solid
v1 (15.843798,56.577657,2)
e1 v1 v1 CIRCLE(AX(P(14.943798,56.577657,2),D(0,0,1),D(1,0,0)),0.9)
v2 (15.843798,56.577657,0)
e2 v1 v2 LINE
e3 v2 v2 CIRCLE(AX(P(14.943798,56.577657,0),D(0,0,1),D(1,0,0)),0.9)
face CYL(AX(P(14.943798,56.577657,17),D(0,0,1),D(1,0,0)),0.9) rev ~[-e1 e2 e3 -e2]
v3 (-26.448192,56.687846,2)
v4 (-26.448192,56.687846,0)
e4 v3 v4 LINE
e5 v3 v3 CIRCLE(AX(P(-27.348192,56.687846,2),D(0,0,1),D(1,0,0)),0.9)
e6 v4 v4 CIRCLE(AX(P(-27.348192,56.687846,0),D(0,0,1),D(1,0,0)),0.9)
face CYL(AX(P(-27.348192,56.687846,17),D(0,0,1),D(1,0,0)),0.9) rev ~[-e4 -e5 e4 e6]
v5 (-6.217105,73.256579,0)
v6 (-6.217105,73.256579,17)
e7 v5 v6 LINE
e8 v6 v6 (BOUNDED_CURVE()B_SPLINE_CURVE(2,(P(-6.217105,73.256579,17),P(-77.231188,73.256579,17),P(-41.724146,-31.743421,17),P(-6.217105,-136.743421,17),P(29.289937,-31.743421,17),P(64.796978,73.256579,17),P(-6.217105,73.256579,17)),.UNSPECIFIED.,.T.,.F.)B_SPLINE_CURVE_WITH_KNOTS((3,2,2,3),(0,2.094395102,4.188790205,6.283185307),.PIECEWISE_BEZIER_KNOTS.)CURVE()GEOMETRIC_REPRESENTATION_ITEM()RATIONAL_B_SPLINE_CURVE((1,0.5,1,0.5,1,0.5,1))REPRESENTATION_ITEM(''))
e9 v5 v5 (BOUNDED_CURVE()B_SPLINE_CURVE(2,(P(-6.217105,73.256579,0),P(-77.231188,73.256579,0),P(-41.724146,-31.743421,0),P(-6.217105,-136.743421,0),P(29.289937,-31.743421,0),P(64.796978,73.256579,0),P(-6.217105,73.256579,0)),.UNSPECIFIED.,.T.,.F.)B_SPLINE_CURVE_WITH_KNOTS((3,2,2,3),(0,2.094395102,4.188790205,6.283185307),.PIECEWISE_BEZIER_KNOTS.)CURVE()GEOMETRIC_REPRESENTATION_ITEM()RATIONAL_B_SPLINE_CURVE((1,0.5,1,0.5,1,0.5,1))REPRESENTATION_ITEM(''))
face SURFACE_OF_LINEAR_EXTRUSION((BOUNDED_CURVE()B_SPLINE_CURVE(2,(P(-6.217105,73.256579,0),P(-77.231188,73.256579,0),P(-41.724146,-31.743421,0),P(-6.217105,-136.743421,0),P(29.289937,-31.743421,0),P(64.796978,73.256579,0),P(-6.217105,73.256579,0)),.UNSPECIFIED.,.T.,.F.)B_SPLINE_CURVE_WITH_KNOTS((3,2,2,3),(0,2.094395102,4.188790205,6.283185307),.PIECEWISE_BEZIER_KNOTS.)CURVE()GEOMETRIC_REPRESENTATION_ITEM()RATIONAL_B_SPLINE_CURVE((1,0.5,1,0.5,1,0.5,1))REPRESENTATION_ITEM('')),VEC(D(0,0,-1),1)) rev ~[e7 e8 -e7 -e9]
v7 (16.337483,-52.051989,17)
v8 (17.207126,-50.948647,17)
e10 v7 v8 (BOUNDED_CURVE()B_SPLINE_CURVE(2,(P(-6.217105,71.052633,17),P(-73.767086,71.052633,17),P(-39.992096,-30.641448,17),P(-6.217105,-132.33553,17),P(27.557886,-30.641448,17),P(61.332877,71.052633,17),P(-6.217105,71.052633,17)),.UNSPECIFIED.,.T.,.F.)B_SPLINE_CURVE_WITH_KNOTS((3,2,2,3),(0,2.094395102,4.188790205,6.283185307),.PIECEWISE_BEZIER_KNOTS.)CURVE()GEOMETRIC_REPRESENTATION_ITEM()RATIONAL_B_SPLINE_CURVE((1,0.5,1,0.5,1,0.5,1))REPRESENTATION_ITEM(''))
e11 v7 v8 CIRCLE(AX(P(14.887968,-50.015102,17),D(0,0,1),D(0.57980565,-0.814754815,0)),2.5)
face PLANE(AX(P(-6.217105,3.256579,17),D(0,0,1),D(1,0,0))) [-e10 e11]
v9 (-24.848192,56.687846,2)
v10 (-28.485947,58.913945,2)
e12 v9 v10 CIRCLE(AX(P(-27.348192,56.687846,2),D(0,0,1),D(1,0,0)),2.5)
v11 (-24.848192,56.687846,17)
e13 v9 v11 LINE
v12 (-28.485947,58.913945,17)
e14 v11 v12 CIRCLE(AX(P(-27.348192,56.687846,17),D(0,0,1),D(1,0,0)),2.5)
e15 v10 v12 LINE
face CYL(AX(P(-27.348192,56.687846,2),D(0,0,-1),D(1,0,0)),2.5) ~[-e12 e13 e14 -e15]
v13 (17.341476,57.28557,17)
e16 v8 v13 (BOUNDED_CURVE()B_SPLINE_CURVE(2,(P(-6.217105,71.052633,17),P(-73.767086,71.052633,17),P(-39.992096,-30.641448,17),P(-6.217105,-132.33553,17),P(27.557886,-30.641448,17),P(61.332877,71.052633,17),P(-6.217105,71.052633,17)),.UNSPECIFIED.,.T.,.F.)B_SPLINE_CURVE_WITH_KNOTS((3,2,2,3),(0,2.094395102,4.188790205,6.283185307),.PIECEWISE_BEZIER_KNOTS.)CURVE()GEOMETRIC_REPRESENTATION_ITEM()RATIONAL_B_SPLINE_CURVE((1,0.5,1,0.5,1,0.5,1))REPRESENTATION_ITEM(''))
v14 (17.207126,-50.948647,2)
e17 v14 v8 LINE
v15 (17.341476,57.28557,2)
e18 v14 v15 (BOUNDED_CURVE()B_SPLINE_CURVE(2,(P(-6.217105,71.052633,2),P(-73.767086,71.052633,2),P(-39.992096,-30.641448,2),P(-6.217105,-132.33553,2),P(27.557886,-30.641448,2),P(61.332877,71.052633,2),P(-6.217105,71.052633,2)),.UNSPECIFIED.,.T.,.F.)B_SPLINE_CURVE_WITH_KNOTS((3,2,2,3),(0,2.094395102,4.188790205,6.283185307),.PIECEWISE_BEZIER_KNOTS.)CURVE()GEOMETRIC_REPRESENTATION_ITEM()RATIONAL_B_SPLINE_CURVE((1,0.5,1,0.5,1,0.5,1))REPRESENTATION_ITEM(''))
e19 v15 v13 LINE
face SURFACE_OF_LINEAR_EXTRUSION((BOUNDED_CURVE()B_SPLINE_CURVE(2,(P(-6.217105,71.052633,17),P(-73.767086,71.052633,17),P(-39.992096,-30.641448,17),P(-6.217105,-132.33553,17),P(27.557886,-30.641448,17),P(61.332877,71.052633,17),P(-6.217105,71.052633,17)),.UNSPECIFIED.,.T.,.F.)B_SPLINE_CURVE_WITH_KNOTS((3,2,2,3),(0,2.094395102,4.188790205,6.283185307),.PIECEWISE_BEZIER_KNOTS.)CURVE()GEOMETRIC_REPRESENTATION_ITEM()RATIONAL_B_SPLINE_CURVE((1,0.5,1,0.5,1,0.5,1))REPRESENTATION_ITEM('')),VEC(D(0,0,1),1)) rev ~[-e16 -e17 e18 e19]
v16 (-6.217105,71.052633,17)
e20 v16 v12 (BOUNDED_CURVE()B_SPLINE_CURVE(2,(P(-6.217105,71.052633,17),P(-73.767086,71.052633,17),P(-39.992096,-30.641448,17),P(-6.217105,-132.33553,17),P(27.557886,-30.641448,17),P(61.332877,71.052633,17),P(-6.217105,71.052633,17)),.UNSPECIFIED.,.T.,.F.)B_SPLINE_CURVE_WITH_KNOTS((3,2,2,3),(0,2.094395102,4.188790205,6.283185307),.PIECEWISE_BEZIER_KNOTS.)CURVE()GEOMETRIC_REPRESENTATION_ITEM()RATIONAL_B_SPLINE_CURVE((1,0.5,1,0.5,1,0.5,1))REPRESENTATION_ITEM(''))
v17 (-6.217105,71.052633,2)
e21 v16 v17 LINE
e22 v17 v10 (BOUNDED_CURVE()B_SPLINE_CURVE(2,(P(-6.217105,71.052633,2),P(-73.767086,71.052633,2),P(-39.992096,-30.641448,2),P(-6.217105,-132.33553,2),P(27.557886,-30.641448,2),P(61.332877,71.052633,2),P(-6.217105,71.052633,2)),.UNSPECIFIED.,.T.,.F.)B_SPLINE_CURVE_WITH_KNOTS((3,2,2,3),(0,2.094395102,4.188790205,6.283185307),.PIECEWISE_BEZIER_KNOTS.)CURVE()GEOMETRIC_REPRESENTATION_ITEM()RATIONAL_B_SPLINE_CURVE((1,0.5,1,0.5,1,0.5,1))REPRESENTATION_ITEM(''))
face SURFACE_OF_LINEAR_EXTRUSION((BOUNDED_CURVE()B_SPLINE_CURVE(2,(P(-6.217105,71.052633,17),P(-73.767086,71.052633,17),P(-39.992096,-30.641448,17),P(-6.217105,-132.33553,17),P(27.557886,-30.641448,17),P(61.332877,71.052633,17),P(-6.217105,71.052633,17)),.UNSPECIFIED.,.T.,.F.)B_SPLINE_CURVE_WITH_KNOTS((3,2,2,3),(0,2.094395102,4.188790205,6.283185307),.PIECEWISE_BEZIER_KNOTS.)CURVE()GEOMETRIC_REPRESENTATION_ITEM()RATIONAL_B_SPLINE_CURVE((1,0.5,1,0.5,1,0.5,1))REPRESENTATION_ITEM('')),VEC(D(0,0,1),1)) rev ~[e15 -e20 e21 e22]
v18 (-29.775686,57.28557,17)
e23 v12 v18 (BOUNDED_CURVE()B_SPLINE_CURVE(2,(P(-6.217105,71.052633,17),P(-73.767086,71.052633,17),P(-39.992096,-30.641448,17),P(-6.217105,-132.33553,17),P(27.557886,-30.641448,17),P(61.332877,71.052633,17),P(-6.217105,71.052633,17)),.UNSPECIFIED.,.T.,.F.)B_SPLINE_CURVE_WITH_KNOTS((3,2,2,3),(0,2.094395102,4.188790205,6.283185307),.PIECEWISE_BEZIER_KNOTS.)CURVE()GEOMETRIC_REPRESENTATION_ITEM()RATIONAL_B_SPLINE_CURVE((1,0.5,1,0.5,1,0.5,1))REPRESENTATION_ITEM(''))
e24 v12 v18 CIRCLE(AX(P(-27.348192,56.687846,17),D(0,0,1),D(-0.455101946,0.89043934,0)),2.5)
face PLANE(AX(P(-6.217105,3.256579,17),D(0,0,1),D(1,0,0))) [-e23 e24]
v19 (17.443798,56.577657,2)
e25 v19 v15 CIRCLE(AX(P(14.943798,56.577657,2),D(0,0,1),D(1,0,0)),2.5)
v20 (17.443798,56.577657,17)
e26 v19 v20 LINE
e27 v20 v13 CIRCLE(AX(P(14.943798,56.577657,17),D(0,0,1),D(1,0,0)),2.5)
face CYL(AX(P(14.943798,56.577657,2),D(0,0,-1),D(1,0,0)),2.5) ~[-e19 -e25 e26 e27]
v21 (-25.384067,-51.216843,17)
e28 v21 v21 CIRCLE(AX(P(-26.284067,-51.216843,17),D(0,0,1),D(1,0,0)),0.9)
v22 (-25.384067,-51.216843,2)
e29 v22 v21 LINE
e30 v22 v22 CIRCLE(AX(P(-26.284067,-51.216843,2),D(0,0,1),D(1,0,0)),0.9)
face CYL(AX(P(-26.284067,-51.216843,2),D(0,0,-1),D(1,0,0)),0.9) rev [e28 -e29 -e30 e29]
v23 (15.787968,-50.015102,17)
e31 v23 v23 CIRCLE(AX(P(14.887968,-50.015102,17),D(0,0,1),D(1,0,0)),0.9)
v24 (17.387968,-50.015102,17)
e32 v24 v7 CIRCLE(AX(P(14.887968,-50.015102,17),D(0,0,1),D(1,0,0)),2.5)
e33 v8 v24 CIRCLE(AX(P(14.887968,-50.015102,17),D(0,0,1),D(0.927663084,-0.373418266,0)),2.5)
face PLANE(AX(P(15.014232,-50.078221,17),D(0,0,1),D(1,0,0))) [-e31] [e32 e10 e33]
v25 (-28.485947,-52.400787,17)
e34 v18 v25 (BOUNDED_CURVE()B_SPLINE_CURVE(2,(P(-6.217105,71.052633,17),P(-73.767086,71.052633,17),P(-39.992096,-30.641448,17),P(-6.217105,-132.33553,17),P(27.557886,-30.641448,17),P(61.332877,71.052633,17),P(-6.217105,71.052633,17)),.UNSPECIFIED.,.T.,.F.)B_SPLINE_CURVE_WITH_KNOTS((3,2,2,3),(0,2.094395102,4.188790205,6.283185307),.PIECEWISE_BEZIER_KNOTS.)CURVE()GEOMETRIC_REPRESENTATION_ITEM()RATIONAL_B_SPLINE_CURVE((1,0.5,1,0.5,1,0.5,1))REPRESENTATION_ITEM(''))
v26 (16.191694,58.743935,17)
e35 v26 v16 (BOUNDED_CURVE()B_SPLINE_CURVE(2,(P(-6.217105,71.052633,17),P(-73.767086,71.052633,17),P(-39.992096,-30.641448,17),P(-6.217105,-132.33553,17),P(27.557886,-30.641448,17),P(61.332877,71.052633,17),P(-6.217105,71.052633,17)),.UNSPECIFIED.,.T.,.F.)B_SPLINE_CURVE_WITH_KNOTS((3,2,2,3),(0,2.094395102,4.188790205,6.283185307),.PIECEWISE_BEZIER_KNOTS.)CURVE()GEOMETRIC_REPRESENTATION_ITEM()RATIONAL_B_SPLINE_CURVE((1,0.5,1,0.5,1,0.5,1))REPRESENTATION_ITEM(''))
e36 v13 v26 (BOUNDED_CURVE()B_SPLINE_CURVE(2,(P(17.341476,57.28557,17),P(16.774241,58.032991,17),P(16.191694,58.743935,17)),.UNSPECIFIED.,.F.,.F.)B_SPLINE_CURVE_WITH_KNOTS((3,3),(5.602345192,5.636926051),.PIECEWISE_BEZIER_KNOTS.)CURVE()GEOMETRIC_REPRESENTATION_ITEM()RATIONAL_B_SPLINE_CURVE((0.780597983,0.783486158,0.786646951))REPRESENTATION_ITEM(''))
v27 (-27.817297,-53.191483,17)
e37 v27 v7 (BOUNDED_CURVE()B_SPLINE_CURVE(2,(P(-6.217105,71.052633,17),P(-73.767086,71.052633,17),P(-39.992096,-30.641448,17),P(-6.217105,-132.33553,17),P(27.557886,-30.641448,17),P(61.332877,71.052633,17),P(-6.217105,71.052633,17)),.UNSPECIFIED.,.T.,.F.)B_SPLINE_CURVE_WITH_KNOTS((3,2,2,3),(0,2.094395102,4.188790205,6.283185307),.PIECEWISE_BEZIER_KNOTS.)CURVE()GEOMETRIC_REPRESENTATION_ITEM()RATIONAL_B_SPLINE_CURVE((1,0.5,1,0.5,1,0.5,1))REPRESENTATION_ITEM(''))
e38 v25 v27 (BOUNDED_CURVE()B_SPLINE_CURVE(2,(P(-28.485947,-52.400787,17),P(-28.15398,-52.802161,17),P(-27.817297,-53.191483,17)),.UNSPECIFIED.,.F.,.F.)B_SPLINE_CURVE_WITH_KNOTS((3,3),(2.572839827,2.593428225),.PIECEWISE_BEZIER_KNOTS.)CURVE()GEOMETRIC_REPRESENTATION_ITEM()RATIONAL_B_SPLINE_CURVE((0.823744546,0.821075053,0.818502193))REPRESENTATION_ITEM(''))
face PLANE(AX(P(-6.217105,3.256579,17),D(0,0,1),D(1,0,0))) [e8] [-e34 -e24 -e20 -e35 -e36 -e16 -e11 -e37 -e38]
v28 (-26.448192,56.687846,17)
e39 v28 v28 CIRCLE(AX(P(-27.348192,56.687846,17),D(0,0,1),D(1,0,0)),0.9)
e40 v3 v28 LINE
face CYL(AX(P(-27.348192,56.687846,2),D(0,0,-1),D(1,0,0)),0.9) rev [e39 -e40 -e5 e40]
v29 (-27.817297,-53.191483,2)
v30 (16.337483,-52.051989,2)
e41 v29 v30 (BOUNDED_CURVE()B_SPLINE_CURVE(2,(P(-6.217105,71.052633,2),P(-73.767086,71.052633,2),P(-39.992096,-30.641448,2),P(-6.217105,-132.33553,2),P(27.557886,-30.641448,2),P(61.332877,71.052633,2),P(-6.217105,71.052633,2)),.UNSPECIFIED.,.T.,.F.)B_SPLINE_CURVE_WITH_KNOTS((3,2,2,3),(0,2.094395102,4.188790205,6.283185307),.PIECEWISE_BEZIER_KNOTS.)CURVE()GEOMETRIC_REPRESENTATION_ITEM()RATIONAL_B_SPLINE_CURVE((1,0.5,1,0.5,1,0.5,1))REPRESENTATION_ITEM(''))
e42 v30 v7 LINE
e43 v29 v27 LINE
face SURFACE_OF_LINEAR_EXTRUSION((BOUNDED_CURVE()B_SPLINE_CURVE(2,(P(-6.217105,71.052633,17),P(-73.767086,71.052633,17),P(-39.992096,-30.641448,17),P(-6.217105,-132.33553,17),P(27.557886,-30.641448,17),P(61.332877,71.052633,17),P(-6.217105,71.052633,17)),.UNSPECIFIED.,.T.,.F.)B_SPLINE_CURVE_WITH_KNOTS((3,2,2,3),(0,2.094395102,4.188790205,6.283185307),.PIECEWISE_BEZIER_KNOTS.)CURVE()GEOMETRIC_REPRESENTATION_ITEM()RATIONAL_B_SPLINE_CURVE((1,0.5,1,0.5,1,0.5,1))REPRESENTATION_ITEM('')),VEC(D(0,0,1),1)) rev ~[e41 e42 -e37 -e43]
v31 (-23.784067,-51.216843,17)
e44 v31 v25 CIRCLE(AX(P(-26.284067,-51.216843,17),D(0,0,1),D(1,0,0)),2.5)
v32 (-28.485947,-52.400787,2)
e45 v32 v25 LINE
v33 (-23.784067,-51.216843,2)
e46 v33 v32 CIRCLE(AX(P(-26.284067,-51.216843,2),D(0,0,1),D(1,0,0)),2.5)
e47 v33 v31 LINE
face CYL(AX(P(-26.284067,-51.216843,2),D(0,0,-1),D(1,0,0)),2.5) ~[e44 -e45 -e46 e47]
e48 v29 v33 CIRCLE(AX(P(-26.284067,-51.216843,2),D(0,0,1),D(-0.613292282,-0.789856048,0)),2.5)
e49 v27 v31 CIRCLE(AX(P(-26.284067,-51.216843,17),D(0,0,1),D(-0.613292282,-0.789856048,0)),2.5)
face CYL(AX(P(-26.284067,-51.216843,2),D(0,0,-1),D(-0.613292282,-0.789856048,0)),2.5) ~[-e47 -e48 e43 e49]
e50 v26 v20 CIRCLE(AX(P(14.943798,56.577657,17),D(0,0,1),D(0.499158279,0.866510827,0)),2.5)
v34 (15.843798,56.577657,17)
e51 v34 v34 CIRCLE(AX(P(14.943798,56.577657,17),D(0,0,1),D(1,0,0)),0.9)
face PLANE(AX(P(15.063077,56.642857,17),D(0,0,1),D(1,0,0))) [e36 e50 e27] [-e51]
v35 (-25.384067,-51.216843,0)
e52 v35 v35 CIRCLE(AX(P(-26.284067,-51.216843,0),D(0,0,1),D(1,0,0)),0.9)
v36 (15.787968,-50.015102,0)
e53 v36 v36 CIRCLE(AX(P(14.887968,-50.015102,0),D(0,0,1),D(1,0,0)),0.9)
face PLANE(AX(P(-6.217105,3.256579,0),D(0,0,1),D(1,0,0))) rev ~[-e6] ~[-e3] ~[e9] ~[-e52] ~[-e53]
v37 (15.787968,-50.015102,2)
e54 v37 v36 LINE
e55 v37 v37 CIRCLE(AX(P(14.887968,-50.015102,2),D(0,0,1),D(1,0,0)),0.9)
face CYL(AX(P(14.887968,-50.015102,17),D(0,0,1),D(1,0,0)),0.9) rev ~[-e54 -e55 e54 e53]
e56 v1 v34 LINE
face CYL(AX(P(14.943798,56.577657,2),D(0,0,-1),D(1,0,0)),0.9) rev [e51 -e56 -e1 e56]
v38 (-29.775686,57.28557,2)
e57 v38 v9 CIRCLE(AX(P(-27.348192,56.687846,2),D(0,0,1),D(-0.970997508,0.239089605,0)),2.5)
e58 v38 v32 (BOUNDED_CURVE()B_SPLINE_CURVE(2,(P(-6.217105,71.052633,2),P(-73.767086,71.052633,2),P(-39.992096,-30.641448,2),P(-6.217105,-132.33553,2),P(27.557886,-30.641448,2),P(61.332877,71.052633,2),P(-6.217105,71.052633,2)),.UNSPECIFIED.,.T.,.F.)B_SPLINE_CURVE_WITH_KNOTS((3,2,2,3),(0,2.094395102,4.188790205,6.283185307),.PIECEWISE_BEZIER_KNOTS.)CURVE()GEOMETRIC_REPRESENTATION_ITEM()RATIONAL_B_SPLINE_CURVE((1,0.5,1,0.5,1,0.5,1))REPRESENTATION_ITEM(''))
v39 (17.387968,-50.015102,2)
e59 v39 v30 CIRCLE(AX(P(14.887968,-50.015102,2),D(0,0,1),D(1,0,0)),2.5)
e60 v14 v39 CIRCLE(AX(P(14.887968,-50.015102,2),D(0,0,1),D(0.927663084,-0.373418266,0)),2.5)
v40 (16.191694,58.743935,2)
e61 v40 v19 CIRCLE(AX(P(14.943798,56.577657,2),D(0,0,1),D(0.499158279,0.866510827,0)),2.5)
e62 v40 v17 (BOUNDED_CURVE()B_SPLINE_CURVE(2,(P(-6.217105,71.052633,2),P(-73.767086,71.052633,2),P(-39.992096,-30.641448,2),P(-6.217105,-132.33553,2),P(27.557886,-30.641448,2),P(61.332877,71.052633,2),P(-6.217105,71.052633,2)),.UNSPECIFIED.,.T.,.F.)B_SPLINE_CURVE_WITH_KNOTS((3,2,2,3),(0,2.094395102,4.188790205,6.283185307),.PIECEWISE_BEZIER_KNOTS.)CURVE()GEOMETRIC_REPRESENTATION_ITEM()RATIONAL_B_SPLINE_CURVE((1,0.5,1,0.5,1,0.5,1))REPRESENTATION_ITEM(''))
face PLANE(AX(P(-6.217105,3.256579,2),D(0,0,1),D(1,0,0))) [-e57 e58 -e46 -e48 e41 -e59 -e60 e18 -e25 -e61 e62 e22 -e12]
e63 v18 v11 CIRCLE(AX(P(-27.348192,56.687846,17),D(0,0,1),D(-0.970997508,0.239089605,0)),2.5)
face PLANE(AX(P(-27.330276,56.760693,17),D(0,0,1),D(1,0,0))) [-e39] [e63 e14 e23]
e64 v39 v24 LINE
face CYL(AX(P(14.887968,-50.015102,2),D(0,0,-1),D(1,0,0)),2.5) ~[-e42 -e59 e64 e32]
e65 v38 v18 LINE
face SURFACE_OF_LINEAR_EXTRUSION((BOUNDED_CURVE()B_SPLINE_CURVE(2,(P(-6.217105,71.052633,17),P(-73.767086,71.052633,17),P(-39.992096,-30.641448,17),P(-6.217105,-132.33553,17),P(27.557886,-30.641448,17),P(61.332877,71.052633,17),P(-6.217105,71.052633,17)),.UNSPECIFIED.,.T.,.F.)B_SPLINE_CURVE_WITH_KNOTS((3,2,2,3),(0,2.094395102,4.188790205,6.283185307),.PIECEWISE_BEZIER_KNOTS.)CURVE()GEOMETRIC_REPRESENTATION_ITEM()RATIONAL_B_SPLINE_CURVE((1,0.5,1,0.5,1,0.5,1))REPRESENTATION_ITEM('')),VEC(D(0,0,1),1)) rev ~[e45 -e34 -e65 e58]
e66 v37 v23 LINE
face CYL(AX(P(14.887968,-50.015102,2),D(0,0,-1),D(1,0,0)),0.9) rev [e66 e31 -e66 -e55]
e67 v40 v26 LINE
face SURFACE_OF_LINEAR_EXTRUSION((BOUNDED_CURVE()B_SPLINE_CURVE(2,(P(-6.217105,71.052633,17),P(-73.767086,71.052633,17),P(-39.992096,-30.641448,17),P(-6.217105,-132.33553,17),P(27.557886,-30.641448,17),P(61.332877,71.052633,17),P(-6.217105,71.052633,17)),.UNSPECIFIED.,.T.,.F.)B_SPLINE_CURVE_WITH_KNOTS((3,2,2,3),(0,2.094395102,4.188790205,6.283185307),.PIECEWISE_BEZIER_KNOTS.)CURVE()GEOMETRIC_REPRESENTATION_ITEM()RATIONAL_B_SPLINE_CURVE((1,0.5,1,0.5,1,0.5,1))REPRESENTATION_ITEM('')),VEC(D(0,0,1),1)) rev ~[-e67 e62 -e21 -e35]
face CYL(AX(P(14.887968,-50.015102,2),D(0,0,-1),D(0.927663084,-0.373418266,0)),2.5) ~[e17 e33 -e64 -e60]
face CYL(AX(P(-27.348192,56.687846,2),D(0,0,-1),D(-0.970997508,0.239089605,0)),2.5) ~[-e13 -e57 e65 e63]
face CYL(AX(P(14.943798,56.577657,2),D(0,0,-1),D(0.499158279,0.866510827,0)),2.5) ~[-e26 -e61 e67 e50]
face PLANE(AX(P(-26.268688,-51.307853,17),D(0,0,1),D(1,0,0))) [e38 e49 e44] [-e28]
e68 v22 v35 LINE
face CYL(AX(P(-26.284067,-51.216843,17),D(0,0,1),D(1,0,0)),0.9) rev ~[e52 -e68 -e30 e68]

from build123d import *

# Parameters (mm, degrees)
F1_DEPTH  = 17
F3_DEPTH  = 15
F4_R      = 0.9
F5_DEPTH  = 15
F6_R      = 0.9
F7_DEPTH  = 15
F8_R      = 0.9
F9_DEPTH  = 15
F10_R     = 0.9
F11_DEPTH = 15
F13_R     = 0.9
F14_DEPTH = 17.0010001


with BuildPart() as f1:
    # F0 (on Top) → F1 (new body)
    with BuildSketch(Plane.XY):
        with BuildLine():
            add(Edge.make_bspline(
                [(-6.2171048485, 73.2565789297), (-77.2311879588, 73.2565789297), (-41.7241464036, -31.7434210703), (-6.2171048485, -136.7434210703), (29.2899367067, -31.7434210703), (64.7969782618, 73.2565789297), (-6.2171048485, 73.2565789297)],
                knots=[0, 0, 0, 2.0943951024, 2.0943951024, 4.1887902048, 4.1887902048, 6.2831853072, 6.2831853072, 6.2831853072], degree=2, weights=[1, 0.5, 1, 0.5, 1, 0.5, 1]))
        make_face()
    extrude(amount=F1_DEPTH)

    # F2 (on face) → F3 (cut)
    with BuildSketch(Plane.XY.offset(17)):
        with BuildLine():
            add(Edge.make_bspline(
                [(-6.2171048485, 71.0526332259), (-73.7670863437, 71.0526332259), (-39.9920955961, -30.6414482184), (-6.2171048485, -132.3355296627), (27.5578858991, -30.6414482184), (61.3328766467, 71.0526332259), (-6.2171048485, 71.0526332259)],
                knots=[0, 0, 0, 2.0943951024, 2.0943951024, 4.1887902048, 4.1887902048, 6.2831853072, 6.2831853072, 6.2831853072], degree=2, weights=[1, 0.5, 1, 0.5, 1, 0.5, 1]))
        make_face()
    extrude(amount=-F3_DEPTH, mode=Mode.SUBTRACT)

    # F4 (on face) → F5 (join)
    with BuildSketch(Plane.XY.offset(2)):
        with BuildLine():
            ThreePointArc((-29.7756858862, 57.2855702673), (-27.6492449133, 54.2060390081), (-24.8481921157, 56.6878462554))
            ThreePointArc((-24.8481921157, 56.6878462554), (-26.0432758657, 58.8202612198), (-28.48594698, 58.9139446065))
            add(Edge.make_bspline(
                [(-28.48594698, 58.9139446065), (-29.1403899926, 58.1226714215), (-29.7756858862, 57.2855702673)],
                knots=[0.6420928407, 0.6420928407, 0.6420928407, 0.6808401148, 0.6808401148, 0.6808401148], degree=2, weights=[0.7874125542, 0.783834135, 0.7805979828]))
        make_face()
        with Locations((-27.3481921157, 56.6878462554)):
            Circle(F4_R, mode=Mode.SUBTRACT)
        with BuildLine():
            add(Edge.make_bspline(
                [(-28.48594698, 58.9139446065), (-29.1403899926, 58.1226714215), (-29.7756858862, 57.2855702673)],
                knots=[0.6420928407, 0.6420928407, 0.6420928407, 0.6808401148, 0.6808401148, 0.6808401148], degree=2, weights=[0.7874125542, 0.783834135, 0.7805979828]))
            ThreePointArc((-28.48594698, 58.9139446065), (-29.3079498058, 58.2400542943), (-29.7756858862, 57.2855702673))
        make_face()
    extrude(amount=F5_DEPTH)

    # F6 (on face) → F7 (join)
    with BuildSketch(Plane.XY.offset(2)):
        with BuildLine():
            ThreePointArc((16.1916939477, 58.7439345546), (12.7793422864, 55.3266057789), (17.4437982507, 56.577657488))
            ThreePointArc((17.4437982507, 56.577657488), (17.4180855063, 56.9352921855), (17.3414761892, 57.2855702673))
            add(Edge.make_bspline(
                [(17.3414761892, 57.2855702673), (16.7742405528, 58.0329914466), (16.1916939477, 58.7439345546)],
                knots=[5.6023451924, 5.6023451924, 5.6023451924, 5.6369260508, 5.6369260508, 5.6369260508], degree=2, weights=[0.7805979828, 0.7834861581, 0.7866469513]))
        make_face()
        with Locations((14.9437982507, 56.577657488)):
            Circle(F6_R, mode=Mode.SUBTRACT)
    extrude(amount=F7_DEPTH)

    # F8 (on face) → F9 (join)
    with BuildSketch(Plane.XY.offset(2)):
        with BuildLine():
            ThreePointArc((-27.8172974331, -53.191482885), (-25.1847662143, -53.4621797963), (-23.7840667271, -51.2168427654))
            ThreePointArc((-23.7840667271, -51.2168427654), (-26.8945171213, -48.792518052), (-28.48594698, -52.4007867471))
            add(Edge.make_bspline(
                [(-28.48594698, -52.4007867471), (-28.1539802485, -52.8021606908), (-27.8172974331, -53.191482885)],
                knots=[2.5728398269, 2.5728398269, 2.5728398269, 2.5934282254, 2.5934282254, 2.5934282254], degree=2, weights=[0.8237445465, 0.8210750527, 0.8185021925]))
        make_face()
        with Locations((-26.2840667271, -51.2168427654)):
            Circle(F8_R, mode=Mode.SUBTRACT)
    extrude(amount=F9_DEPTH)

    # F10 (on face) → F11 (join)
    with BuildSketch(Plane.XY.offset(2)):
        with BuildLine():
            ThreePointArc((17.2071260982, -50.948647347), (17.3423414514, -50.4905518475), (17.3879683871, -50.0151016807))
            ThreePointArc((17.3879683871, -50.0151016807), (12.6660564501, -48.8691927208), (16.3374825114, -52.0519887181))
            add(Edge.make_bspline(
                [(16.3374825114, -52.0519887181), (16.7766850943, -51.5107523345), (17.2071260982, -50.948647347)],
                knots=[3.7192756497, 3.7192756497, 3.7192756497, 3.746975358, 3.746975358, 3.746975358], degree=2, weights=[0.8260785, 0.8297264389, 0.8335492953]))
        make_face()
        with Locations((14.8879683871, -50.0151016807)):
            Circle(F10_R, mode=Mode.SUBTRACT)
        with BuildLine():
            add(Edge.make_bspline(
                [(16.3374825114, -52.0519887181), (16.7766850943, -51.5107523345), (17.2071260982, -50.948647347)],
                knots=[3.7192756497, 3.7192756497, 3.7192756497, 3.746975358, 3.746975358, 3.746975358], degree=2, weights=[0.8260785, 0.8297264389, 0.8335492953]))
            ThreePointArc((16.3374825114, -52.0519887181), (16.8513996683, -51.5626602753), (17.2071260982, -50.948647347))
        make_face()
    extrude(amount=F11_DEPTH)

    # F13 (on face) → F14 (cut, through all)
    with BuildSketch(Plane.XY.offset(17)):
        with Locations((-27.3481921157, 56.6878462554)):
            Circle(F13_R)
        with Locations((14.9437982507, 56.577657488)):
            Circle(F13_R)
        with Locations((-26.2840667271, -51.2168427654)):
            Circle(F13_R)
        with Locations((14.8879683871, -50.0151016807)):
            Circle(F13_R)
    extrude(amount=-F14_DEPTH, mode=Mode.SUBTRACT)


solid = f1.part
